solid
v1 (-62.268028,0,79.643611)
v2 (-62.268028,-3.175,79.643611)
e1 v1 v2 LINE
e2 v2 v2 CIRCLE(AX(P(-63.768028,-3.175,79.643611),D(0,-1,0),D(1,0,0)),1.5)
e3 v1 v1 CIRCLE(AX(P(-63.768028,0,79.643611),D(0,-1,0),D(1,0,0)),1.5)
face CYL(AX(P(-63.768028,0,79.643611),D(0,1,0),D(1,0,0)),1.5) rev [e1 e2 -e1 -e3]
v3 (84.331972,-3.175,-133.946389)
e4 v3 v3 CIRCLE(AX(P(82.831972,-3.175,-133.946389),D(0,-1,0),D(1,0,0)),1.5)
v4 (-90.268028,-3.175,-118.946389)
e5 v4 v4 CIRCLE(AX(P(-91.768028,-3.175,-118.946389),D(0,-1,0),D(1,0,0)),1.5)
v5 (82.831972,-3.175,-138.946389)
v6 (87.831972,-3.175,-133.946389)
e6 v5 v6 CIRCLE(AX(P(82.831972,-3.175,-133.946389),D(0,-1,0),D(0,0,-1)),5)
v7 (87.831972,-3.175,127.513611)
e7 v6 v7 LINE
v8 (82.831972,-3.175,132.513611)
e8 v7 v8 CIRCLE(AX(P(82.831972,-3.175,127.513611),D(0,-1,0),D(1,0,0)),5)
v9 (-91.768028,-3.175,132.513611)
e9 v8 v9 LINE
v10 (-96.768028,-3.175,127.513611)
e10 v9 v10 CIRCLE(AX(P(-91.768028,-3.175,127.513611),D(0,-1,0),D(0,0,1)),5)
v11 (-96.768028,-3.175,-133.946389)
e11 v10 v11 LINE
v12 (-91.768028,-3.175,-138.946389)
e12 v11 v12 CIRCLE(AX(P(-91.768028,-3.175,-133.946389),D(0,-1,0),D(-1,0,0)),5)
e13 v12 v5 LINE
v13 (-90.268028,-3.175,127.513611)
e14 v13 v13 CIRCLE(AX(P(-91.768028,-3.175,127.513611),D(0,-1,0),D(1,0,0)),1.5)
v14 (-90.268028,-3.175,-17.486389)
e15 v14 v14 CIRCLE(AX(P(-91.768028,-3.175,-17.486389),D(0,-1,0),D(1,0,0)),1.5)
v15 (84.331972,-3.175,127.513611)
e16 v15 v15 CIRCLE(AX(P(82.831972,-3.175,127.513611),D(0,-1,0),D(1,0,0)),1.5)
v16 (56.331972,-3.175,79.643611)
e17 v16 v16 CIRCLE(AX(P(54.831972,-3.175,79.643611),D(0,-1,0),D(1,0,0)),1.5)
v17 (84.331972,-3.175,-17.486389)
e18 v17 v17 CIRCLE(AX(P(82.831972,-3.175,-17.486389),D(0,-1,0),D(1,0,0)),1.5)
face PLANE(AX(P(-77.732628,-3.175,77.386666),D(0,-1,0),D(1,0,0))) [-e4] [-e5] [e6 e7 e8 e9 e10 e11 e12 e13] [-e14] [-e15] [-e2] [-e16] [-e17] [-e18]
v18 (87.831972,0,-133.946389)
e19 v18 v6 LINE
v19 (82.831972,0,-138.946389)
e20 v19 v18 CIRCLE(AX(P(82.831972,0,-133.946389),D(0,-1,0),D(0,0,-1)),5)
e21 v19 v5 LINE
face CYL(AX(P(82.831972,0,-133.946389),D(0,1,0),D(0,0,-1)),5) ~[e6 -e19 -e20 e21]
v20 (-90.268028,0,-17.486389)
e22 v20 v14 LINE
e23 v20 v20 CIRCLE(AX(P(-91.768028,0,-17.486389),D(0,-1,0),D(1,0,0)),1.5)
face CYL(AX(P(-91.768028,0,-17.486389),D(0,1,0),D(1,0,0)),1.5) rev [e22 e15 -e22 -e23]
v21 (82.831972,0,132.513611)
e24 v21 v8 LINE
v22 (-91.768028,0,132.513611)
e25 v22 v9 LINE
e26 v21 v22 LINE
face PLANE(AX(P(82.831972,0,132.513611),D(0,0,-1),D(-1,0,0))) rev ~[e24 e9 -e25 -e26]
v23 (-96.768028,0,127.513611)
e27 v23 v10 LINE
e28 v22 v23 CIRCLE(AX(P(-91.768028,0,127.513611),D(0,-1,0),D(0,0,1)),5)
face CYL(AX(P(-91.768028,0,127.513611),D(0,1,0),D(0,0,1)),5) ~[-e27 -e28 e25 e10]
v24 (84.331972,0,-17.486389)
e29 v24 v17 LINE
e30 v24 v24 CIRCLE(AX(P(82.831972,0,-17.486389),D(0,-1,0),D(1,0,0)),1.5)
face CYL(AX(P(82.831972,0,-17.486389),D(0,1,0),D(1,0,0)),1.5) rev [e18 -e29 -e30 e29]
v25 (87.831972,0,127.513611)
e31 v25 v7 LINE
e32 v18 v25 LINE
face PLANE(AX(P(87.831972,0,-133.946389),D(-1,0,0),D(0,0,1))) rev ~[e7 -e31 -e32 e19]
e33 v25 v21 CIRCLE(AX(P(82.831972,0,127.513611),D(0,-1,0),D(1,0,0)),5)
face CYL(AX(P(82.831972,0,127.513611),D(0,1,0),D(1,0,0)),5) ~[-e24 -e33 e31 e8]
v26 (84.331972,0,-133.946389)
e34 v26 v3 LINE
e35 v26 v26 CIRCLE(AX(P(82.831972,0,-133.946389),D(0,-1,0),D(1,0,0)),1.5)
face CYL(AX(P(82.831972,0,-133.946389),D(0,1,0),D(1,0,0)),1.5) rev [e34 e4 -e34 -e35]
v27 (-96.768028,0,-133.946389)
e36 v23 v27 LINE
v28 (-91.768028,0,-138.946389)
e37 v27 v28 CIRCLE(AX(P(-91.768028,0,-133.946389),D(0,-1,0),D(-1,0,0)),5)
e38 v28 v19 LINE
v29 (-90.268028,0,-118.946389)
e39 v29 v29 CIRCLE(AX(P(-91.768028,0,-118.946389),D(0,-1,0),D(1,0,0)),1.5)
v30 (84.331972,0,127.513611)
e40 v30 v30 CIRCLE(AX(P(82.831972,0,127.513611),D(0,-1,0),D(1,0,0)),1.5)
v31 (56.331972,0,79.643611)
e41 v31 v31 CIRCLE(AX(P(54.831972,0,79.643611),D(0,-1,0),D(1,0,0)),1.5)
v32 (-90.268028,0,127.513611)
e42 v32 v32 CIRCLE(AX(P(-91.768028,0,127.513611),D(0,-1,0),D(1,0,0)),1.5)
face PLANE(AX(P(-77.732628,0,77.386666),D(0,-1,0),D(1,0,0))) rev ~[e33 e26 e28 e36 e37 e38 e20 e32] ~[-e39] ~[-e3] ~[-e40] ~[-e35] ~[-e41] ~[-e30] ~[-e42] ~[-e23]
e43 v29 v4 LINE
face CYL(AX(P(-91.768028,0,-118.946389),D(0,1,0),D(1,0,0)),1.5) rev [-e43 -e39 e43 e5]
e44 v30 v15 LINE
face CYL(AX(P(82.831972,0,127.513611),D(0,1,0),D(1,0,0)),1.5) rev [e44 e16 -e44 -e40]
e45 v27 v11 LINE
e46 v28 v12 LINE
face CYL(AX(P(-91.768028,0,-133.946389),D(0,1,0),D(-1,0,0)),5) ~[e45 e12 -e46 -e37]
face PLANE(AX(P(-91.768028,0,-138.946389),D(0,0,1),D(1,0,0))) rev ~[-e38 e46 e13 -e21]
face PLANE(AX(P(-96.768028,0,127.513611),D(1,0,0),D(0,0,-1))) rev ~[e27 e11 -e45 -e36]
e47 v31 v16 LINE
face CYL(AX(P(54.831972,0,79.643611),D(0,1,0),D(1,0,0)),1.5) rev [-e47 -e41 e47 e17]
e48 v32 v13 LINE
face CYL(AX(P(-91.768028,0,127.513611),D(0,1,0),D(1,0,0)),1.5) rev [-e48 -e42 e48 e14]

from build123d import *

# Parameters (mm, degrees)
F0_R     = 1.5
F0_W     = 30
F0_H     = 6.7
F0_W_2   = 10
F0_H_2   = 91.46
F0_H_3   = 15
F0_W_3   = 164.6
F0_H_4   = 2.834
F0_H_5   = 5.5
F0_W_4   = 70
F0_H_6   = 1.7
F0_H_7   = 1.48
F0_H_8   = 5
F0_W_5   = 3
F0_H_9   = 1.4
F0_H_10  = 0.6
F1_DEPTH = 3.175


# Not quite as in the source:
# - a feature names something its author has since deleted; it is built from what else it names


with BuildPart() as f1:
    # F0 (on Front) → F1 (new body)
    with BuildSketch(Plane.XZ):
        with BuildLine():
            Line((-18.7680281997, 132.5136111658), (-91.7680281997, 132.5136111658))
            ThreePointArc((-91.7680281997, 132.5136111658), (-95.3035621056, 131.0491450717), (-96.7680281997, 127.5136111658))
            Line((-96.7680281997, 127.5136111658), (-96.7680281997, -22.4863888342))
            Line((-96.7680281997, -22.4863888342), (-86.7680281997, -22.4863888342))
            Line((-86.7680281997, -22.4863888342), (-86.7680281997, 13.1196111658))
            Line((-86.7680281997, 13.1196111658), (-86.7680281997, 15.9536111658))
            Line((-86.7680281997, 15.9536111658), (-86.7680281997, 21.4536111658))
            Line((-86.7680281997, 21.4536111658), (-89.7680281997, 21.4536111658))
            Line((-89.7680281997, 21.4536111658), (-89.7680281997, 22.0536111658))
            Line((-89.7680281997, 22.0536111658), (-89.7680281997, 22.8536111658))
            Line((-89.7680281997, 22.8536111658), (-89.7680281997, 23.4536111658))
            Line((-89.7680281997, 23.4536111658), (-86.7680281997, 23.4536111658))
            Line((-86.7680281997, 23.4536111658), (-86.7680281997, 24.6436111658))
            Line((-86.7680281997, 24.6436111658), (-86.7680281997, 53.4536111658))
            Line((-86.7680281997, 53.4536111658), (-86.7680281997, 60.9536111658))
            Line((-86.7680281997, 60.9536111658), (-86.7680281997, 64.0936111658))
            Line((-86.7680281997, 64.0936111658), (-86.7680281997, 122.5136111658))
            Line((-86.7680281997, 122.5136111658), (-40.4680281997, 122.5136111658))
            Line((-40.4680281997, 122.5136111658), (-39.4680281997, 122.5136111658))
            Line((-39.4680281997, 122.5136111658), (-39.4680281997, 124.2136111658))
            Line((-39.4680281997, 124.2136111658), (-49.4680281997, 124.2136111658))
            Line((-49.4680281997, 124.2136111658), (-49.4680281997, 125.8136111658))
            Line((-49.4680281997, 125.8136111658), (-28.7680281997, 125.8136111658))
            Line((-28.7680281997, 125.8136111658), (-18.7680281997, 125.8136111658))
            Line((-18.7680281997, 125.8136111658), (-18.7680281997, 132.5136111658))
        make_face()
        with Locations((-91.7680281997, -17.4863888342)):
            Circle(F0_R, mode=Mode.SUBTRACT)
        with Locations((-91.7680281997, 127.5136111658)):
            Circle(F0_R, mode=Mode.SUBTRACT)
        with Locations((-3.7680281997, 129.1636111658)):
            Rectangle(F0_W, F0_H)
        with BuildLine():
            Line((82.8319718003, 132.5136111658), (11.2319718003, 132.5136111658))
            Line((11.2319718003, 132.5136111658), (11.2319718003, 125.8136111658))
            Line((11.2319718003, 125.8136111658), (21.2319718003, 125.8136111658))
            Line((21.2319718003, 125.8136111658), (40.5319718003, 125.8136111658))
            Line((40.5319718003, 125.8136111658), (40.5319718003, 124.2136111658))
            Line((40.5319718003, 124.2136111658), (30.5319718003, 124.2136111658))
            Line((30.5319718003, 124.2136111658), (30.5319718003, 122.5136111658))
            Line((30.5319718003, 122.5136111658), (40.5319718003, 122.5136111658))
            Line((40.5319718003, 122.5136111658), (77.8319718003, 122.5136111658))
            Line((77.8319718003, 122.5136111658), (77.8319718003, 64.0936111658))
            Line((77.8319718003, 64.0936111658), (77.8319718003, 60.9536111658))
            Line((77.8319718003, 60.9536111658), (77.8319718003, 53.4536111658))
            Line((77.8319718003, 53.4536111658), (77.8319718003, 24.6436111658))
            Line((77.8319718003, 24.6436111658), (77.8319718003, 23.4536111658))
            Line((77.8319718003, 23.4536111658), (80.8319718003, 23.4536111658))
            Line((80.8319718003, 23.4536111658), (80.8319718003, 22.8536111658))
            Line((80.8319718003, 22.8536111658), (80.8319718003, 21.4536111658))
            Line((80.8319718003, 21.4536111658), (77.8319718003, 21.4536111658))
            Line((77.8319718003, 21.4536111658), (77.8319718003, 15.9536111658))
            Line((77.8319718003, 15.9536111658), (77.8319718003, 13.1196111658))
            Line((77.8319718003, 13.1196111658), (77.8319718003, -128.9463888342))
            Line((77.8319718003, -128.9463888342), (1.2319718003, -128.9463888342))
            Line((1.2319718003, -128.9463888342), (1.2319718003, -130.4263888342))
            Line((1.2319718003, -130.4263888342), (3.7319718003, -130.4263888342))
            Line((3.7319718003, -130.4263888342), (3.7319718003, -132.0263888342))
            Line((3.7319718003, -132.0263888342), (-11.2680281997, -132.0263888342))
            Line((-11.2680281997, -132.0263888342), (-11.2680281997, -130.4263888342))
            Line((-11.2680281997, -130.4263888342), (-8.7680281997, -130.4263888342))
            Line((-8.7680281997, -130.4263888342), (-8.7680281997, -128.9463888342))
            Line((-8.7680281997, -128.9463888342), (-86.7680281997, -128.9463888342))
            Line((-86.7680281997, -128.9463888342), (-96.7680281997, -128.9463888342))
            Line((-96.7680281997, -128.9463888342), (-96.7680281997, -132.2803888342))
            Line((-96.7680281997, -132.2803888342), (-96.7680281997, -133.9463888342))
            ThreePointArc((-96.7680281997, -133.9463888342), (-95.3035621056, -137.4819227401), (-91.7680281997, -138.9463888342))
            Line((-91.7680281997, -138.9463888342), (82.8319718003, -138.9463888342))
            ThreePointArc((82.8319718003, -138.9463888342), (86.3675057063, -137.4819227401), (87.8319718003, -133.9463888342))
            Line((87.8319718003, -133.9463888342), (87.8319718003, 127.5136111658))
            ThreePointArc((87.8319718003, 127.5136111658), (86.3675057063, 131.0491450717), (82.8319718003, 132.5136111658))
        make_face()
        with Locations((82.8319718003, -133.9463888342)):
            Circle(F0_R, mode=Mode.SUBTRACT)
        with Locations((82.8319718003, -17.4863888342)):
            Circle(F0_R, mode=Mode.SUBTRACT)
        with Locations((82.8319718003, 127.5136111658)):
            Circle(F0_R, mode=Mode.SUBTRACT)
        Polygon((11.2319718003, 125.8136111658), (-18.7680281997, 125.8136111658), (-28.7680281997, 125.8136111658), (-49.4680281997, 125.8136111658), (-49.4680281997, 124.2136111658), (-39.4680281997, 124.2136111658), (30.5319718003, 124.2136111658), (40.5319718003, 124.2136111658), (40.5319718003, 125.8136111658), (21.2319718003, 125.8136111658), align=None)
        with Locations((-91.7680281997, -68.2163888342)):
            Rectangle(F0_W_2, F0_H_2)
        with Locations((-91.7680281997, -121.4463888342)):
            Rectangle(F0_W_2, F0_H_3)
        with Locations((-91.7680281997, -118.9463888342)):
            Circle(F0_R, mode=Mode.SUBTRACT)
        Polygon((-86.7680281997, 13.1196111658), (-86.7680281997, -22.4863888342), (-86.7680281997, -113.9463888342), (-86.7680281997, -128.9463888342), (-8.7680281997, -128.9463888342), (1.2319718003, -128.9463888342), (77.8319718003, -128.9463888342), (77.8319718003, 13.1196111658), align=None)
        with Locations((-4.4680281997, 14.5366111658)):
            Rectangle(F0_W_3, F0_H_4)
        with Locations((-4.4680281997, 18.7036111658)):
            Rectangle(F0_W_3, F0_H_5)
        with Locations((-4.4680281997, 123.3636111658)):
            Rectangle(F0_W_4, F0_H_6)
        with Locations((-3.7680281997, -129.6863888342)):
            Rectangle(F0_W_2, F0_H_7)
        Polygon((-89.7680281997, 21.4536111658), (-86.7680281997, 21.4536111658), (-86.7680281997, 22.0536111658), (-86.7680281997, 22.8536111658), (-89.7680281997, 22.8536111658), (-89.7680281997, 22.0536111658), align=None)
        Polygon((-86.7680281997, 22.0536111658), (-86.7680281997, 21.4536111658), (77.8319718003, 21.4536111658), (77.8319718003, 22.8536111658), (77.8319718003, 23.4536111658), (-86.7680281997, 23.4536111658), (-86.7680281997, 22.8536111658), align=None)
        Polygon((-39.4680281997, 117.5136111658), (-39.4680281997, 122.5136111658), (-40.4680281997, 122.5136111658), (-86.7680281997, 122.5136111658), (-86.7680281997, 64.0936111658), (-66.675587153, 64.0936111658), align=None)
        with Locations((-63.7680281997, 79.6436111658)):
            Circle(F0_R, mode=Mode.SUBTRACT)
        with Locations((-4.4680281997, 120.0136111658)):
            Rectangle(F0_W_4, F0_H_8)
        Polygon((1.2319718003, -130.4263888342), (-8.7680281997, -130.4263888342), (-11.2680281997, -130.4263888342), (-11.2680281997, -132.0263888342), (3.7319718003, -132.0263888342), (3.7319718003, -130.4263888342), align=None)
        with Locations((79.3319718003, 22.1536111658)):
            Rectangle(F0_W_5, F0_H_9)
        Polygon((40.5319718003, 122.5136111658), (30.5319718003, 122.5136111658), (30.5319718003, 117.5136111658), (57.7395307537, 64.0936111658), (77.8319718003, 64.0936111658), (77.8319718003, 122.5136111658), align=None)
        with Locations((54.8319718003, 79.6436111658)):
            Circle(F0_R, mode=Mode.SUBTRACT)
        Polygon((30.5319718003, 117.5136111658), (-39.4680281997, 117.5136111658), (-66.675587153, 64.0936111658), (57.7395307537, 64.0936111658), align=None)
        with Locations((-88.2680281997, 23.1536111658)):
            Rectangle(F0_W_5, F0_H_10)
        with Locations((79.3319718003, 23.1536111658)):
            Rectangle(F0_W_5, F0_H_10)
        Polygon((57.7395307537, 64.0936111658), (-66.675587153, 64.0936111658), (-68.2748334113, 60.9536111658), (59.3387770119, 60.9536111658), align=None)
        Polygon((-68.2748334113, 60.9536111658), (-66.675587153, 64.0936111658), (-86.7680281997, 64.0936111658), (-86.7680281997, 60.9536111658), align=None)
        Polygon((-86.7680281997, 24.6436111658), (-86.7680281997, 23.4536111658), (77.8319718003, 23.4536111658), (77.8319718003, 24.6436111658), (63.1586327242, 53.4536111658), (-72.0946891235, 53.4536111658), align=None)
        Polygon((77.8319718003, 64.0936111658), (57.7395307537, 64.0936111658), (59.3387770119, 60.9536111658), (77.8319718003, 60.9536111658), align=None)
        Polygon((59.3387770119, 60.9536111658), (-68.2748334113, 60.9536111658), (-72.0946891235, 53.4536111658), (63.1586327242, 53.4536111658), align=None)
        Polygon((-72.0946891235, 53.4536111658), (-68.2748334113, 60.9536111658), (-86.7680281997, 60.9536111658), (-86.7680281997, 53.4536111658), align=None)
        Polygon((-86.7680281997, 53.4536111658), (-86.7680281997, 24.6436111658), (-72.0946891235, 53.4536111658), align=None)
        Polygon((63.1586327242, 53.4536111658), (77.8319718003, 24.6436111658), (77.8319718003, 53.4536111658), align=None)
        Polygon((77.8319718003, 60.9536111658), (59.3387770119, 60.9536111658), (63.1586327242, 53.4536111658), (77.8319718003, 53.4536111658), align=None)
    extrude(amount=F1_DEPTH)


solid = f1.part
